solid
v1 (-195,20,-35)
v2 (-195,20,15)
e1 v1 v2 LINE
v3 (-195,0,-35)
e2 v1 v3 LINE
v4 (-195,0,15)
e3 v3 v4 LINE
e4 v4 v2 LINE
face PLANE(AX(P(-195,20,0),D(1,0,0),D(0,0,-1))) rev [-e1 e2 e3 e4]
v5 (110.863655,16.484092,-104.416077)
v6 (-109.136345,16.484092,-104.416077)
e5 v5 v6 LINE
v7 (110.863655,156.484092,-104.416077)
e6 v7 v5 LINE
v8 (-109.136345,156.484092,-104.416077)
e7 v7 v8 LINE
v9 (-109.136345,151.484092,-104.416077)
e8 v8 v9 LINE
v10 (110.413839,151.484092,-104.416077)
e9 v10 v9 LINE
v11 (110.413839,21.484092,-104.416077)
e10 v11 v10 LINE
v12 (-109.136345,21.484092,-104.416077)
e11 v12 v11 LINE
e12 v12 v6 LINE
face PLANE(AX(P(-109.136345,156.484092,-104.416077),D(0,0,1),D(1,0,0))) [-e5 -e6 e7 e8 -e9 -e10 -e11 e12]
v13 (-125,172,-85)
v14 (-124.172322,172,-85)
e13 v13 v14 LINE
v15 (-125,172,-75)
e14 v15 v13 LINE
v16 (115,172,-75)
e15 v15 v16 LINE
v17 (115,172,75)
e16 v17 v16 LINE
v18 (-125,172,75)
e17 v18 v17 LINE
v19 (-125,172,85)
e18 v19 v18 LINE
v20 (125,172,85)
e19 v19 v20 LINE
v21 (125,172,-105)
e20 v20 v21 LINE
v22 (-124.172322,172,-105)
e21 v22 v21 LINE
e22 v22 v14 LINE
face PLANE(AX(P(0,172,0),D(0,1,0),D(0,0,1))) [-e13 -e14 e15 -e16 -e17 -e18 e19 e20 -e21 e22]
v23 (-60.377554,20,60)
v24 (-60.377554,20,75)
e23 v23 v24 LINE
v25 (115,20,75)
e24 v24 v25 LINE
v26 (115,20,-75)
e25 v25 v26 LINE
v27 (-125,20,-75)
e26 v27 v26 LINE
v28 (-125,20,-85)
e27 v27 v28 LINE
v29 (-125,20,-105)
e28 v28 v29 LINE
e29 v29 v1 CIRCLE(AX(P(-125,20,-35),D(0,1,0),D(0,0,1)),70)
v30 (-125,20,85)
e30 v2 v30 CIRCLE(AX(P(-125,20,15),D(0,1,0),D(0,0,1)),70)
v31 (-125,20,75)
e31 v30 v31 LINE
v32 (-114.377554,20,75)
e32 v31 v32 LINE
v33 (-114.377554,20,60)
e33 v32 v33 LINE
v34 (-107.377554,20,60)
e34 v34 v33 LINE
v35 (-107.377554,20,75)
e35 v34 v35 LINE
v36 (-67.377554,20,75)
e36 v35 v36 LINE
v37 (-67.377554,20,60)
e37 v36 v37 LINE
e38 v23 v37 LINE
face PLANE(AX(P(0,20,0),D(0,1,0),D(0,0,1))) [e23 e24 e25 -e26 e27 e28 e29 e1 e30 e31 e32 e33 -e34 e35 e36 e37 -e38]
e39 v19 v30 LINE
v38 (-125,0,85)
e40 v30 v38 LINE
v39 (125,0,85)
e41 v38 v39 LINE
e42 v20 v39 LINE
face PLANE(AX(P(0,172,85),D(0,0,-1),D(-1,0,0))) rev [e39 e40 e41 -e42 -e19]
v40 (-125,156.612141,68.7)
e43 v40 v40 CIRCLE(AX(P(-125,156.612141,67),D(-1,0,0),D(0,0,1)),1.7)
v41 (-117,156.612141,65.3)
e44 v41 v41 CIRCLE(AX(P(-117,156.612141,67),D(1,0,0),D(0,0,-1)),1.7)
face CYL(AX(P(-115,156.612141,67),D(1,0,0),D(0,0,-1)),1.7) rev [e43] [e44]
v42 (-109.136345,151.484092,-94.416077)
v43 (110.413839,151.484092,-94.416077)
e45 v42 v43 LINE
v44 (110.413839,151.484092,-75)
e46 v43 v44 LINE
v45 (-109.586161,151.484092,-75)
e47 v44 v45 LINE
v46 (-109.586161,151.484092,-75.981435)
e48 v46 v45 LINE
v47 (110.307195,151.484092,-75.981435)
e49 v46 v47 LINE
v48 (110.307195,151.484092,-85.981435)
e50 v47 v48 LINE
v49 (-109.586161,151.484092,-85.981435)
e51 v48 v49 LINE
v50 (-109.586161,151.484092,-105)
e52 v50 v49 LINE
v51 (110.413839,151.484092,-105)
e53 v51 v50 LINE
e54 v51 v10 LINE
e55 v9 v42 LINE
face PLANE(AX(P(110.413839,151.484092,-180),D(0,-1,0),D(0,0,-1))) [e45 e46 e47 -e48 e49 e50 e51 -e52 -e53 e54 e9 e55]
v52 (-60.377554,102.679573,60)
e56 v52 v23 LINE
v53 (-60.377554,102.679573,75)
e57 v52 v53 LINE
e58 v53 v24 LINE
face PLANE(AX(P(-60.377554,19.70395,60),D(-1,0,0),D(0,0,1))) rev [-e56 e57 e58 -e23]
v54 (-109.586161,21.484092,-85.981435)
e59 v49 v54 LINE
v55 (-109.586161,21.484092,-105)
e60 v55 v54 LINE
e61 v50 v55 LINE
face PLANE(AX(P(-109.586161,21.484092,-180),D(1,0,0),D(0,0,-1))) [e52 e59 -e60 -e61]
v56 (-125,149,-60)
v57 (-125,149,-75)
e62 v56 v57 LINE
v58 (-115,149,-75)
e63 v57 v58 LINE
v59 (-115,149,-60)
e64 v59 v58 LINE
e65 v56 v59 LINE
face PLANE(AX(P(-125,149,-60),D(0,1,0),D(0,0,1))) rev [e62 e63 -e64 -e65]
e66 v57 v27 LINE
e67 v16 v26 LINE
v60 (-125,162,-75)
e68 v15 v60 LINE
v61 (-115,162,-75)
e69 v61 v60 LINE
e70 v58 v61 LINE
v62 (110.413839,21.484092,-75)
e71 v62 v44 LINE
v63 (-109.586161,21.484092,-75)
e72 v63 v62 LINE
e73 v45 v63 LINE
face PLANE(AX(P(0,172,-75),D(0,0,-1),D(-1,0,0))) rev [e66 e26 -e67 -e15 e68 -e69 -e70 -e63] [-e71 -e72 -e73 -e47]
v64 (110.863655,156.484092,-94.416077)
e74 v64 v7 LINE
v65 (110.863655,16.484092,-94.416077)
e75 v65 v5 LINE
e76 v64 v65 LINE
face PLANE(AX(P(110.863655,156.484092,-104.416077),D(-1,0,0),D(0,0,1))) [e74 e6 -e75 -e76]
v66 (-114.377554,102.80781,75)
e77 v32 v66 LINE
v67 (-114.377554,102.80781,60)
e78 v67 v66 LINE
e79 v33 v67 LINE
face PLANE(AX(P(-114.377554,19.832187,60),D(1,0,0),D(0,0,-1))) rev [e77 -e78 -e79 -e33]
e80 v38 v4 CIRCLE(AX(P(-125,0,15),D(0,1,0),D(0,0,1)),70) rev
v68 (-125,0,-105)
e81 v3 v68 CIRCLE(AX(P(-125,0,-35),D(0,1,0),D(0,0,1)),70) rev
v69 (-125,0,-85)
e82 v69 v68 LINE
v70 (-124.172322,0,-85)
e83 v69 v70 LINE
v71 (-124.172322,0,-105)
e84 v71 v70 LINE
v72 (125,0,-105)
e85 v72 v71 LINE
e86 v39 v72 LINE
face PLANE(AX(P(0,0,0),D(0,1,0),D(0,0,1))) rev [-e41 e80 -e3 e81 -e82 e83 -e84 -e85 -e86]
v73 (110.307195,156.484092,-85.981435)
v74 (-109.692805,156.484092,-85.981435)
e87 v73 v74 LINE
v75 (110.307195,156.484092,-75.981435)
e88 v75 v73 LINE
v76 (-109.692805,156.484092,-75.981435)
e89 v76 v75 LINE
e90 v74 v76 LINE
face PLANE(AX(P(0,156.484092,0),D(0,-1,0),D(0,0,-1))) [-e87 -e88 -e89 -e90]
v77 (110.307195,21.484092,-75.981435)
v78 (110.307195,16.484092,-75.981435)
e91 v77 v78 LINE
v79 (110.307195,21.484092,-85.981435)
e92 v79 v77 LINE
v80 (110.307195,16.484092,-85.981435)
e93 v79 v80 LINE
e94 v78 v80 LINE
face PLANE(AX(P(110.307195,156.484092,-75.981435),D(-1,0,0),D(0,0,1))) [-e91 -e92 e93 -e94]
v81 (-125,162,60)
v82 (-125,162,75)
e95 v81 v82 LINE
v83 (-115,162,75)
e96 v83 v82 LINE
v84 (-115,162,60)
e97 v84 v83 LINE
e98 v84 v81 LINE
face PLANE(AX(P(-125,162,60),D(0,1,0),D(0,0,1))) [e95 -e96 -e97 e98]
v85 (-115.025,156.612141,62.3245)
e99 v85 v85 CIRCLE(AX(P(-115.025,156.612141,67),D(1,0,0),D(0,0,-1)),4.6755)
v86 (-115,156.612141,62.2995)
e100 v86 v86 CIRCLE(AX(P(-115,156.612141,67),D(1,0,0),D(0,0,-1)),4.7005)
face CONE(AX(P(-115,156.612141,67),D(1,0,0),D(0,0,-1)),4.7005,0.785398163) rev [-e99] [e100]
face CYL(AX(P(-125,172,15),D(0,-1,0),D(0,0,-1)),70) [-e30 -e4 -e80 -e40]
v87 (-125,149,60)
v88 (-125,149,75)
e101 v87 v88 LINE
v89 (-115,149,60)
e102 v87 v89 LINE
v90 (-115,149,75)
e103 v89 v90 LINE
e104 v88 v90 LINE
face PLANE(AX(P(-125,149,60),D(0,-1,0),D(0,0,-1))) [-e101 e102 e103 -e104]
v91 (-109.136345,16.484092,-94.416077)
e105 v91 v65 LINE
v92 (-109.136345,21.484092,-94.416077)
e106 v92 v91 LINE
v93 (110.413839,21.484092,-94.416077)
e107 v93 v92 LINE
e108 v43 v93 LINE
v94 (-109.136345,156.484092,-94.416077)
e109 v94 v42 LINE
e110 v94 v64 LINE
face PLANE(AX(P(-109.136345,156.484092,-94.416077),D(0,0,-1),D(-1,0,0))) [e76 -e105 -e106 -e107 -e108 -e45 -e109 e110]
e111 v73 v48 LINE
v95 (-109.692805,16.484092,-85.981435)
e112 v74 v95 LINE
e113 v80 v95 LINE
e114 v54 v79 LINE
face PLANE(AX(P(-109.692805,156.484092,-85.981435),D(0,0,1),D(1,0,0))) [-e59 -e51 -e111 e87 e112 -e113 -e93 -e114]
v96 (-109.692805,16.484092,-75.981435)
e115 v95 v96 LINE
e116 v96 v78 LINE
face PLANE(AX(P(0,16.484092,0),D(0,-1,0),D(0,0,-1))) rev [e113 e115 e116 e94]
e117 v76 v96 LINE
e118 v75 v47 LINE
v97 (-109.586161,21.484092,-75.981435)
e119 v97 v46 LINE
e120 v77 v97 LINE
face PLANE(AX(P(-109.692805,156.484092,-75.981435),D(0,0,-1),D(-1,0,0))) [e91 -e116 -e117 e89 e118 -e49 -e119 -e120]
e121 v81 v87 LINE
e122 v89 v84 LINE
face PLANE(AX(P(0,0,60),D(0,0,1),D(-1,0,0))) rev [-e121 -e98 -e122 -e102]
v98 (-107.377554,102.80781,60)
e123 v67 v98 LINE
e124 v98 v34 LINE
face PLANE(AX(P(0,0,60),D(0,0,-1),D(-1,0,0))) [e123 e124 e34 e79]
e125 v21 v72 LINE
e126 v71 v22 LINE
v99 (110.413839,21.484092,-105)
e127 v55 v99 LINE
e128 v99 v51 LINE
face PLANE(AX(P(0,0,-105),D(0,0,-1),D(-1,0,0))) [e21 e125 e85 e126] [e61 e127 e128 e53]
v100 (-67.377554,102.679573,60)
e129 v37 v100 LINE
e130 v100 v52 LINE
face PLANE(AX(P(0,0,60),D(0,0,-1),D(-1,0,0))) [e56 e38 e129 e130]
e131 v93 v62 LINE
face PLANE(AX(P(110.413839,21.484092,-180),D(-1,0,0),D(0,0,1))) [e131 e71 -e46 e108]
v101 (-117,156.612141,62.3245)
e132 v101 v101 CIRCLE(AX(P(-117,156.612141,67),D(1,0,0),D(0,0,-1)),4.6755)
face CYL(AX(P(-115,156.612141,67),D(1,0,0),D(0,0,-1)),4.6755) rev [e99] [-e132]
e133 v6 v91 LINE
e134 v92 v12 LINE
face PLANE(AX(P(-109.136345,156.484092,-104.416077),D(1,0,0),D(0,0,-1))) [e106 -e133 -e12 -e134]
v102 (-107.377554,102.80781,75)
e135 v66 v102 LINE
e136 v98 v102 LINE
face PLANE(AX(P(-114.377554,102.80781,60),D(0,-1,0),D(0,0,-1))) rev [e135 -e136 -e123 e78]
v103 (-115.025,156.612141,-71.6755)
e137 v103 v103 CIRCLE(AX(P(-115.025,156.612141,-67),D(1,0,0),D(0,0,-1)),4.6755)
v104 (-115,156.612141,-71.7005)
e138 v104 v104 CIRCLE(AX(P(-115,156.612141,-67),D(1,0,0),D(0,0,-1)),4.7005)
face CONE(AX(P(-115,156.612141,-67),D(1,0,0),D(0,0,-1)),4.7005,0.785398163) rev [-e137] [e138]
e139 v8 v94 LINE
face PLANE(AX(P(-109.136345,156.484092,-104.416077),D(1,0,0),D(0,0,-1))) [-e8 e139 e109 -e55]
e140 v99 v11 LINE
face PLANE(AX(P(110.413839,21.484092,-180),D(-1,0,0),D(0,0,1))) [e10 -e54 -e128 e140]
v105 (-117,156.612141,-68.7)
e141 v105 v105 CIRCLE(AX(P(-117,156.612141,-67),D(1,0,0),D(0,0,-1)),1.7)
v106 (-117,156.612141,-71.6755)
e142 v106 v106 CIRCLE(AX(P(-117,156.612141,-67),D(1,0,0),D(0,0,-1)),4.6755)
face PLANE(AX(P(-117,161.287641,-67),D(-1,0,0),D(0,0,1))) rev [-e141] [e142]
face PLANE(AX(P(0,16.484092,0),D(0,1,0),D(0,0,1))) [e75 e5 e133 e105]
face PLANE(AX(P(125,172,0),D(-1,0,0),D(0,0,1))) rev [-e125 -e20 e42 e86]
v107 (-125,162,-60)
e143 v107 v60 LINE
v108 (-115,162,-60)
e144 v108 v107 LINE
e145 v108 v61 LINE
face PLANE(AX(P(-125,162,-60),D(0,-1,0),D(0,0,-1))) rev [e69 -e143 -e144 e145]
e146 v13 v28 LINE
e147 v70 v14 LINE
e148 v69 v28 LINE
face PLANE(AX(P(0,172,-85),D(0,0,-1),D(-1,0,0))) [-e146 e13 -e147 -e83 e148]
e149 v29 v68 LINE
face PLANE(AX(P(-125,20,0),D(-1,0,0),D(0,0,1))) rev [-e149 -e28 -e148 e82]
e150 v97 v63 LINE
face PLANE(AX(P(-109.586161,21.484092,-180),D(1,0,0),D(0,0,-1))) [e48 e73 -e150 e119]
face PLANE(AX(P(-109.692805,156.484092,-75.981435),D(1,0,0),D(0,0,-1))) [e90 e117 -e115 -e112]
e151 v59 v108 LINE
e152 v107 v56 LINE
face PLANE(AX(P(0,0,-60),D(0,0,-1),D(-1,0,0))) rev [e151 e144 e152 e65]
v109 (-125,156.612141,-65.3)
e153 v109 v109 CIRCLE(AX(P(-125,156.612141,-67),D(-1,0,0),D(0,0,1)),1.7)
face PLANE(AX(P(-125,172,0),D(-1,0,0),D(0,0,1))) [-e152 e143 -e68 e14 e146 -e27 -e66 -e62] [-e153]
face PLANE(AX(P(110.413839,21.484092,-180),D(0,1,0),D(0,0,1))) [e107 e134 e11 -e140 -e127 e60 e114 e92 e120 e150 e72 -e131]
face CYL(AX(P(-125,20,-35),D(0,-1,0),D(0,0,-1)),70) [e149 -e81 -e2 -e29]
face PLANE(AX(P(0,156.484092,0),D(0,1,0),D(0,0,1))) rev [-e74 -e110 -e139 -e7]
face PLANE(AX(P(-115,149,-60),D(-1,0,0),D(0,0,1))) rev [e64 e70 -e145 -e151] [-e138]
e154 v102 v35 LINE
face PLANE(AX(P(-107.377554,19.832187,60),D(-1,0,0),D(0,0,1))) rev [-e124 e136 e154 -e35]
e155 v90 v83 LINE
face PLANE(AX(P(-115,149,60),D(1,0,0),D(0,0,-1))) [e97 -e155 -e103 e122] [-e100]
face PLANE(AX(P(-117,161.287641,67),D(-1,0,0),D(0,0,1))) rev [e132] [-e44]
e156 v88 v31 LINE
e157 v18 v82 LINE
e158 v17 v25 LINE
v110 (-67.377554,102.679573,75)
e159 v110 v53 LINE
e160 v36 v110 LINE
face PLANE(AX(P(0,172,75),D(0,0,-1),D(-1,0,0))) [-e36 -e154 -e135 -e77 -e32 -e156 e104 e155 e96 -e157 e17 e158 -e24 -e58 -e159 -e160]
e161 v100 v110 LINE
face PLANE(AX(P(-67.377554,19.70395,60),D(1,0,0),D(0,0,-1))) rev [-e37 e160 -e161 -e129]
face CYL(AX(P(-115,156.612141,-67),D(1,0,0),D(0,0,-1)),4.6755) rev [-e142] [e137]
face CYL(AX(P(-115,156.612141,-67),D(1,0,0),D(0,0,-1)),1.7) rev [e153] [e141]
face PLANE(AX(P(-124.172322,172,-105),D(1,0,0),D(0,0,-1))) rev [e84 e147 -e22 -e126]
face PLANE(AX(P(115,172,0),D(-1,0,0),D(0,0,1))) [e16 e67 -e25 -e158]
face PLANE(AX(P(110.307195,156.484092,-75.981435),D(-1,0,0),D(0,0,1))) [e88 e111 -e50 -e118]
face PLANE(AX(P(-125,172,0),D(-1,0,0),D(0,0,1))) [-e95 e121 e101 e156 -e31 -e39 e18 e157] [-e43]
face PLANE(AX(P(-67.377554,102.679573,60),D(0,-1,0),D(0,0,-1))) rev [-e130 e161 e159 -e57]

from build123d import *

# Parameters (mm, degrees)
BOSS_EXTRUDE1_DEPTH     = 172
BOSS_EXTRUDE2_DEPTH     = 20
SKETCH2_W               = 10
SKETCH2_H               = 13
BOSS_EXTRUDE3_DEPTH     = 15
SKETCH6_W               = 7
SKETCH6_H               = 82.975623271
BOSS_EXTRUDE4_DEPTH     = 15
SKETCH9_W               = 249.172322426
SKETCH9_H               = 172
BOSS_EXTRUDE7_DEPTH     = 20
CUT_EXTRUDE3_DEPTH      = 75
CUT_EXTRUDE3_DEPTH_BACK = 75
SKETCH11_W              = 220
SKETCH11_H              = 130
CUT_EXTRUDE4_DEPTH      = 135
CUT_EXTRUDE4_DEPTH_BACK = 5
SKETCH12_W              = 220
SKETCH12_H              = 10
FILLET2_R               = 70


with BuildPart() as part:
    # Sketch1 → Boss-Extrude1 (new body)
    with BuildSketch(Plane(origin=(0, 0, 0), x_dir=(1, 0, 0), z_dir=(0, 1, 0))):
        Polygon((-125, -75), (-125, -85), (125, -85), (125, 85), (-125, 85), (-125, 75), (115, 75), (115, -75), align=None)
    extrude(amount=BOSS_EXTRUDE1_DEPTH)

    # Sketch1<3> → Boss-Extrude2 (add)
    with BuildSketch(Plane(origin=(0, 0, 0), x_dir=(1, 0, 0), z_dir=(0, 1, 0))):
        Polygon((-195, -85), (-125, -85), (-125, -75), (115, -75), (115, 75), (-125, 75), (-125, 105), (-195, 105), align=None)
    extrude(amount=BOSS_EXTRUDE2_DEPTH)

    # Sketch2 → Boss-Extrude3 (add)
    with BuildSketch(Plane.XY.offset(-75)):
        with Locations((-120, 155.5)):
            Rectangle(SKETCH2_W, SKETCH2_H)
    boss_extrude3 = extrude(amount=BOSS_EXTRUDE3_DEPTH)

    # Sketch5 → CBORE for M3 Hex Head Cap Screw1 (revolve, cut)
    with BuildSketch(Plane(origin=(-115, 156.612141417, -67), x_dir=(0, 0, -1), z_dir=(0, 1, 0))):
        Polygon((0, 0), (0, 80), (1.7, 80), (1.7, 2), (4.6755, 2), (4.6755, 0.025), (4.7005, 0), align=None)
    cbore_for_m3_hex_head_cap_screw1 = revolve(axis=Axis((-108.65, 156.612141417, -67), (-1, 0, 0)), mode=Mode.SUBTRACT)

    # Mirror1: Boss-Extrude3, CBORE for M3 Hex Head Cap Screw1 across plane
    add(boss_extrude3.mirror(Plane.XY))
    add(cbore_for_m3_hex_head_cap_screw1.mirror(Plane.XY), mode=Mode.SUBTRACT)

    # Sketch6 → Boss-Extrude4 (add)
    with BuildSketch(Plane(origin=(0, 0, 75), x_dir=(-1, 0, 0), z_dir=(0, 0, -1))):
        with Locations((110.877553526, 61.319998757)):
            Rectangle(SKETCH6_W, SKETCH6_H)
        with Locations((63.877553526, 61.191761533)):
            Rectangle(SKETCH6_W, SKETCH6_H)
    extrude(amount=BOSS_EXTRUDE4_DEPTH)

    # Sketch9 → Boss-Extrude7 (add)
    with BuildSketch(Plane(origin=(0, 0, -85), x_dir=(-1, 0, 0), z_dir=(0, 0, -1))):
        with Locations((-0.413838787, 86)):
            Rectangle(SKETCH9_W, SKETCH9_H)
    extrude(amount=BOSS_EXTRUDE7_DEPTH)

    # Sketch11 → Cut-Extrude3 (cut, two sides: drawn at the far end of the back side and taken through both)
    with BuildSketch(Plane(origin=(0, 0, -105), x_dir=(-1, 0, 0), z_dir=(0, 0, -1)).offset(-CUT_EXTRUDE3_DEPTH_BACK)):
        with Locations((-0.413838787, 86.484091926)):
            Rectangle(SKETCH11_W, SKETCH11_H)
    extrude(amount=CUT_EXTRUDE3_DEPTH + CUT_EXTRUDE3_DEPTH_BACK, mode=Mode.SUBTRACT)

    # Sketch12 → Cut-Extrude4 (cut, two sides: drawn at the far end of the back side and taken through both)
    with BuildSketch(Plane(origin=(0, 21.484091926, 0), x_dir=(1, 0, 0), z_dir=(0, 1, 0)).offset(-CUT_EXTRUDE4_DEPTH_BACK)):
        with Locations((0.863655378, 99.416077233)):
            Rectangle(SKETCH12_W, SKETCH12_H)
        with Locations((0.307194527, 80.981434553)):
            Rectangle(SKETCH12_W, SKETCH12_H)
    extrude(amount=CUT_EXTRUDE4_DEPTH + CUT_EXTRUDE4_DEPTH_BACK, mode=Mode.SUBTRACT)

    # Fillet2
    fillet2_edges = [part.edges().sort_by_distance(p)[0] for p in [
        (-195, 10, 85),
        (-195, 10, -105),
    ]]
    fillet(fillet2_edges, radius=FILLET2_R - 0.0001)  # a hair under: the kernel refuses the full size


solid = part.part
